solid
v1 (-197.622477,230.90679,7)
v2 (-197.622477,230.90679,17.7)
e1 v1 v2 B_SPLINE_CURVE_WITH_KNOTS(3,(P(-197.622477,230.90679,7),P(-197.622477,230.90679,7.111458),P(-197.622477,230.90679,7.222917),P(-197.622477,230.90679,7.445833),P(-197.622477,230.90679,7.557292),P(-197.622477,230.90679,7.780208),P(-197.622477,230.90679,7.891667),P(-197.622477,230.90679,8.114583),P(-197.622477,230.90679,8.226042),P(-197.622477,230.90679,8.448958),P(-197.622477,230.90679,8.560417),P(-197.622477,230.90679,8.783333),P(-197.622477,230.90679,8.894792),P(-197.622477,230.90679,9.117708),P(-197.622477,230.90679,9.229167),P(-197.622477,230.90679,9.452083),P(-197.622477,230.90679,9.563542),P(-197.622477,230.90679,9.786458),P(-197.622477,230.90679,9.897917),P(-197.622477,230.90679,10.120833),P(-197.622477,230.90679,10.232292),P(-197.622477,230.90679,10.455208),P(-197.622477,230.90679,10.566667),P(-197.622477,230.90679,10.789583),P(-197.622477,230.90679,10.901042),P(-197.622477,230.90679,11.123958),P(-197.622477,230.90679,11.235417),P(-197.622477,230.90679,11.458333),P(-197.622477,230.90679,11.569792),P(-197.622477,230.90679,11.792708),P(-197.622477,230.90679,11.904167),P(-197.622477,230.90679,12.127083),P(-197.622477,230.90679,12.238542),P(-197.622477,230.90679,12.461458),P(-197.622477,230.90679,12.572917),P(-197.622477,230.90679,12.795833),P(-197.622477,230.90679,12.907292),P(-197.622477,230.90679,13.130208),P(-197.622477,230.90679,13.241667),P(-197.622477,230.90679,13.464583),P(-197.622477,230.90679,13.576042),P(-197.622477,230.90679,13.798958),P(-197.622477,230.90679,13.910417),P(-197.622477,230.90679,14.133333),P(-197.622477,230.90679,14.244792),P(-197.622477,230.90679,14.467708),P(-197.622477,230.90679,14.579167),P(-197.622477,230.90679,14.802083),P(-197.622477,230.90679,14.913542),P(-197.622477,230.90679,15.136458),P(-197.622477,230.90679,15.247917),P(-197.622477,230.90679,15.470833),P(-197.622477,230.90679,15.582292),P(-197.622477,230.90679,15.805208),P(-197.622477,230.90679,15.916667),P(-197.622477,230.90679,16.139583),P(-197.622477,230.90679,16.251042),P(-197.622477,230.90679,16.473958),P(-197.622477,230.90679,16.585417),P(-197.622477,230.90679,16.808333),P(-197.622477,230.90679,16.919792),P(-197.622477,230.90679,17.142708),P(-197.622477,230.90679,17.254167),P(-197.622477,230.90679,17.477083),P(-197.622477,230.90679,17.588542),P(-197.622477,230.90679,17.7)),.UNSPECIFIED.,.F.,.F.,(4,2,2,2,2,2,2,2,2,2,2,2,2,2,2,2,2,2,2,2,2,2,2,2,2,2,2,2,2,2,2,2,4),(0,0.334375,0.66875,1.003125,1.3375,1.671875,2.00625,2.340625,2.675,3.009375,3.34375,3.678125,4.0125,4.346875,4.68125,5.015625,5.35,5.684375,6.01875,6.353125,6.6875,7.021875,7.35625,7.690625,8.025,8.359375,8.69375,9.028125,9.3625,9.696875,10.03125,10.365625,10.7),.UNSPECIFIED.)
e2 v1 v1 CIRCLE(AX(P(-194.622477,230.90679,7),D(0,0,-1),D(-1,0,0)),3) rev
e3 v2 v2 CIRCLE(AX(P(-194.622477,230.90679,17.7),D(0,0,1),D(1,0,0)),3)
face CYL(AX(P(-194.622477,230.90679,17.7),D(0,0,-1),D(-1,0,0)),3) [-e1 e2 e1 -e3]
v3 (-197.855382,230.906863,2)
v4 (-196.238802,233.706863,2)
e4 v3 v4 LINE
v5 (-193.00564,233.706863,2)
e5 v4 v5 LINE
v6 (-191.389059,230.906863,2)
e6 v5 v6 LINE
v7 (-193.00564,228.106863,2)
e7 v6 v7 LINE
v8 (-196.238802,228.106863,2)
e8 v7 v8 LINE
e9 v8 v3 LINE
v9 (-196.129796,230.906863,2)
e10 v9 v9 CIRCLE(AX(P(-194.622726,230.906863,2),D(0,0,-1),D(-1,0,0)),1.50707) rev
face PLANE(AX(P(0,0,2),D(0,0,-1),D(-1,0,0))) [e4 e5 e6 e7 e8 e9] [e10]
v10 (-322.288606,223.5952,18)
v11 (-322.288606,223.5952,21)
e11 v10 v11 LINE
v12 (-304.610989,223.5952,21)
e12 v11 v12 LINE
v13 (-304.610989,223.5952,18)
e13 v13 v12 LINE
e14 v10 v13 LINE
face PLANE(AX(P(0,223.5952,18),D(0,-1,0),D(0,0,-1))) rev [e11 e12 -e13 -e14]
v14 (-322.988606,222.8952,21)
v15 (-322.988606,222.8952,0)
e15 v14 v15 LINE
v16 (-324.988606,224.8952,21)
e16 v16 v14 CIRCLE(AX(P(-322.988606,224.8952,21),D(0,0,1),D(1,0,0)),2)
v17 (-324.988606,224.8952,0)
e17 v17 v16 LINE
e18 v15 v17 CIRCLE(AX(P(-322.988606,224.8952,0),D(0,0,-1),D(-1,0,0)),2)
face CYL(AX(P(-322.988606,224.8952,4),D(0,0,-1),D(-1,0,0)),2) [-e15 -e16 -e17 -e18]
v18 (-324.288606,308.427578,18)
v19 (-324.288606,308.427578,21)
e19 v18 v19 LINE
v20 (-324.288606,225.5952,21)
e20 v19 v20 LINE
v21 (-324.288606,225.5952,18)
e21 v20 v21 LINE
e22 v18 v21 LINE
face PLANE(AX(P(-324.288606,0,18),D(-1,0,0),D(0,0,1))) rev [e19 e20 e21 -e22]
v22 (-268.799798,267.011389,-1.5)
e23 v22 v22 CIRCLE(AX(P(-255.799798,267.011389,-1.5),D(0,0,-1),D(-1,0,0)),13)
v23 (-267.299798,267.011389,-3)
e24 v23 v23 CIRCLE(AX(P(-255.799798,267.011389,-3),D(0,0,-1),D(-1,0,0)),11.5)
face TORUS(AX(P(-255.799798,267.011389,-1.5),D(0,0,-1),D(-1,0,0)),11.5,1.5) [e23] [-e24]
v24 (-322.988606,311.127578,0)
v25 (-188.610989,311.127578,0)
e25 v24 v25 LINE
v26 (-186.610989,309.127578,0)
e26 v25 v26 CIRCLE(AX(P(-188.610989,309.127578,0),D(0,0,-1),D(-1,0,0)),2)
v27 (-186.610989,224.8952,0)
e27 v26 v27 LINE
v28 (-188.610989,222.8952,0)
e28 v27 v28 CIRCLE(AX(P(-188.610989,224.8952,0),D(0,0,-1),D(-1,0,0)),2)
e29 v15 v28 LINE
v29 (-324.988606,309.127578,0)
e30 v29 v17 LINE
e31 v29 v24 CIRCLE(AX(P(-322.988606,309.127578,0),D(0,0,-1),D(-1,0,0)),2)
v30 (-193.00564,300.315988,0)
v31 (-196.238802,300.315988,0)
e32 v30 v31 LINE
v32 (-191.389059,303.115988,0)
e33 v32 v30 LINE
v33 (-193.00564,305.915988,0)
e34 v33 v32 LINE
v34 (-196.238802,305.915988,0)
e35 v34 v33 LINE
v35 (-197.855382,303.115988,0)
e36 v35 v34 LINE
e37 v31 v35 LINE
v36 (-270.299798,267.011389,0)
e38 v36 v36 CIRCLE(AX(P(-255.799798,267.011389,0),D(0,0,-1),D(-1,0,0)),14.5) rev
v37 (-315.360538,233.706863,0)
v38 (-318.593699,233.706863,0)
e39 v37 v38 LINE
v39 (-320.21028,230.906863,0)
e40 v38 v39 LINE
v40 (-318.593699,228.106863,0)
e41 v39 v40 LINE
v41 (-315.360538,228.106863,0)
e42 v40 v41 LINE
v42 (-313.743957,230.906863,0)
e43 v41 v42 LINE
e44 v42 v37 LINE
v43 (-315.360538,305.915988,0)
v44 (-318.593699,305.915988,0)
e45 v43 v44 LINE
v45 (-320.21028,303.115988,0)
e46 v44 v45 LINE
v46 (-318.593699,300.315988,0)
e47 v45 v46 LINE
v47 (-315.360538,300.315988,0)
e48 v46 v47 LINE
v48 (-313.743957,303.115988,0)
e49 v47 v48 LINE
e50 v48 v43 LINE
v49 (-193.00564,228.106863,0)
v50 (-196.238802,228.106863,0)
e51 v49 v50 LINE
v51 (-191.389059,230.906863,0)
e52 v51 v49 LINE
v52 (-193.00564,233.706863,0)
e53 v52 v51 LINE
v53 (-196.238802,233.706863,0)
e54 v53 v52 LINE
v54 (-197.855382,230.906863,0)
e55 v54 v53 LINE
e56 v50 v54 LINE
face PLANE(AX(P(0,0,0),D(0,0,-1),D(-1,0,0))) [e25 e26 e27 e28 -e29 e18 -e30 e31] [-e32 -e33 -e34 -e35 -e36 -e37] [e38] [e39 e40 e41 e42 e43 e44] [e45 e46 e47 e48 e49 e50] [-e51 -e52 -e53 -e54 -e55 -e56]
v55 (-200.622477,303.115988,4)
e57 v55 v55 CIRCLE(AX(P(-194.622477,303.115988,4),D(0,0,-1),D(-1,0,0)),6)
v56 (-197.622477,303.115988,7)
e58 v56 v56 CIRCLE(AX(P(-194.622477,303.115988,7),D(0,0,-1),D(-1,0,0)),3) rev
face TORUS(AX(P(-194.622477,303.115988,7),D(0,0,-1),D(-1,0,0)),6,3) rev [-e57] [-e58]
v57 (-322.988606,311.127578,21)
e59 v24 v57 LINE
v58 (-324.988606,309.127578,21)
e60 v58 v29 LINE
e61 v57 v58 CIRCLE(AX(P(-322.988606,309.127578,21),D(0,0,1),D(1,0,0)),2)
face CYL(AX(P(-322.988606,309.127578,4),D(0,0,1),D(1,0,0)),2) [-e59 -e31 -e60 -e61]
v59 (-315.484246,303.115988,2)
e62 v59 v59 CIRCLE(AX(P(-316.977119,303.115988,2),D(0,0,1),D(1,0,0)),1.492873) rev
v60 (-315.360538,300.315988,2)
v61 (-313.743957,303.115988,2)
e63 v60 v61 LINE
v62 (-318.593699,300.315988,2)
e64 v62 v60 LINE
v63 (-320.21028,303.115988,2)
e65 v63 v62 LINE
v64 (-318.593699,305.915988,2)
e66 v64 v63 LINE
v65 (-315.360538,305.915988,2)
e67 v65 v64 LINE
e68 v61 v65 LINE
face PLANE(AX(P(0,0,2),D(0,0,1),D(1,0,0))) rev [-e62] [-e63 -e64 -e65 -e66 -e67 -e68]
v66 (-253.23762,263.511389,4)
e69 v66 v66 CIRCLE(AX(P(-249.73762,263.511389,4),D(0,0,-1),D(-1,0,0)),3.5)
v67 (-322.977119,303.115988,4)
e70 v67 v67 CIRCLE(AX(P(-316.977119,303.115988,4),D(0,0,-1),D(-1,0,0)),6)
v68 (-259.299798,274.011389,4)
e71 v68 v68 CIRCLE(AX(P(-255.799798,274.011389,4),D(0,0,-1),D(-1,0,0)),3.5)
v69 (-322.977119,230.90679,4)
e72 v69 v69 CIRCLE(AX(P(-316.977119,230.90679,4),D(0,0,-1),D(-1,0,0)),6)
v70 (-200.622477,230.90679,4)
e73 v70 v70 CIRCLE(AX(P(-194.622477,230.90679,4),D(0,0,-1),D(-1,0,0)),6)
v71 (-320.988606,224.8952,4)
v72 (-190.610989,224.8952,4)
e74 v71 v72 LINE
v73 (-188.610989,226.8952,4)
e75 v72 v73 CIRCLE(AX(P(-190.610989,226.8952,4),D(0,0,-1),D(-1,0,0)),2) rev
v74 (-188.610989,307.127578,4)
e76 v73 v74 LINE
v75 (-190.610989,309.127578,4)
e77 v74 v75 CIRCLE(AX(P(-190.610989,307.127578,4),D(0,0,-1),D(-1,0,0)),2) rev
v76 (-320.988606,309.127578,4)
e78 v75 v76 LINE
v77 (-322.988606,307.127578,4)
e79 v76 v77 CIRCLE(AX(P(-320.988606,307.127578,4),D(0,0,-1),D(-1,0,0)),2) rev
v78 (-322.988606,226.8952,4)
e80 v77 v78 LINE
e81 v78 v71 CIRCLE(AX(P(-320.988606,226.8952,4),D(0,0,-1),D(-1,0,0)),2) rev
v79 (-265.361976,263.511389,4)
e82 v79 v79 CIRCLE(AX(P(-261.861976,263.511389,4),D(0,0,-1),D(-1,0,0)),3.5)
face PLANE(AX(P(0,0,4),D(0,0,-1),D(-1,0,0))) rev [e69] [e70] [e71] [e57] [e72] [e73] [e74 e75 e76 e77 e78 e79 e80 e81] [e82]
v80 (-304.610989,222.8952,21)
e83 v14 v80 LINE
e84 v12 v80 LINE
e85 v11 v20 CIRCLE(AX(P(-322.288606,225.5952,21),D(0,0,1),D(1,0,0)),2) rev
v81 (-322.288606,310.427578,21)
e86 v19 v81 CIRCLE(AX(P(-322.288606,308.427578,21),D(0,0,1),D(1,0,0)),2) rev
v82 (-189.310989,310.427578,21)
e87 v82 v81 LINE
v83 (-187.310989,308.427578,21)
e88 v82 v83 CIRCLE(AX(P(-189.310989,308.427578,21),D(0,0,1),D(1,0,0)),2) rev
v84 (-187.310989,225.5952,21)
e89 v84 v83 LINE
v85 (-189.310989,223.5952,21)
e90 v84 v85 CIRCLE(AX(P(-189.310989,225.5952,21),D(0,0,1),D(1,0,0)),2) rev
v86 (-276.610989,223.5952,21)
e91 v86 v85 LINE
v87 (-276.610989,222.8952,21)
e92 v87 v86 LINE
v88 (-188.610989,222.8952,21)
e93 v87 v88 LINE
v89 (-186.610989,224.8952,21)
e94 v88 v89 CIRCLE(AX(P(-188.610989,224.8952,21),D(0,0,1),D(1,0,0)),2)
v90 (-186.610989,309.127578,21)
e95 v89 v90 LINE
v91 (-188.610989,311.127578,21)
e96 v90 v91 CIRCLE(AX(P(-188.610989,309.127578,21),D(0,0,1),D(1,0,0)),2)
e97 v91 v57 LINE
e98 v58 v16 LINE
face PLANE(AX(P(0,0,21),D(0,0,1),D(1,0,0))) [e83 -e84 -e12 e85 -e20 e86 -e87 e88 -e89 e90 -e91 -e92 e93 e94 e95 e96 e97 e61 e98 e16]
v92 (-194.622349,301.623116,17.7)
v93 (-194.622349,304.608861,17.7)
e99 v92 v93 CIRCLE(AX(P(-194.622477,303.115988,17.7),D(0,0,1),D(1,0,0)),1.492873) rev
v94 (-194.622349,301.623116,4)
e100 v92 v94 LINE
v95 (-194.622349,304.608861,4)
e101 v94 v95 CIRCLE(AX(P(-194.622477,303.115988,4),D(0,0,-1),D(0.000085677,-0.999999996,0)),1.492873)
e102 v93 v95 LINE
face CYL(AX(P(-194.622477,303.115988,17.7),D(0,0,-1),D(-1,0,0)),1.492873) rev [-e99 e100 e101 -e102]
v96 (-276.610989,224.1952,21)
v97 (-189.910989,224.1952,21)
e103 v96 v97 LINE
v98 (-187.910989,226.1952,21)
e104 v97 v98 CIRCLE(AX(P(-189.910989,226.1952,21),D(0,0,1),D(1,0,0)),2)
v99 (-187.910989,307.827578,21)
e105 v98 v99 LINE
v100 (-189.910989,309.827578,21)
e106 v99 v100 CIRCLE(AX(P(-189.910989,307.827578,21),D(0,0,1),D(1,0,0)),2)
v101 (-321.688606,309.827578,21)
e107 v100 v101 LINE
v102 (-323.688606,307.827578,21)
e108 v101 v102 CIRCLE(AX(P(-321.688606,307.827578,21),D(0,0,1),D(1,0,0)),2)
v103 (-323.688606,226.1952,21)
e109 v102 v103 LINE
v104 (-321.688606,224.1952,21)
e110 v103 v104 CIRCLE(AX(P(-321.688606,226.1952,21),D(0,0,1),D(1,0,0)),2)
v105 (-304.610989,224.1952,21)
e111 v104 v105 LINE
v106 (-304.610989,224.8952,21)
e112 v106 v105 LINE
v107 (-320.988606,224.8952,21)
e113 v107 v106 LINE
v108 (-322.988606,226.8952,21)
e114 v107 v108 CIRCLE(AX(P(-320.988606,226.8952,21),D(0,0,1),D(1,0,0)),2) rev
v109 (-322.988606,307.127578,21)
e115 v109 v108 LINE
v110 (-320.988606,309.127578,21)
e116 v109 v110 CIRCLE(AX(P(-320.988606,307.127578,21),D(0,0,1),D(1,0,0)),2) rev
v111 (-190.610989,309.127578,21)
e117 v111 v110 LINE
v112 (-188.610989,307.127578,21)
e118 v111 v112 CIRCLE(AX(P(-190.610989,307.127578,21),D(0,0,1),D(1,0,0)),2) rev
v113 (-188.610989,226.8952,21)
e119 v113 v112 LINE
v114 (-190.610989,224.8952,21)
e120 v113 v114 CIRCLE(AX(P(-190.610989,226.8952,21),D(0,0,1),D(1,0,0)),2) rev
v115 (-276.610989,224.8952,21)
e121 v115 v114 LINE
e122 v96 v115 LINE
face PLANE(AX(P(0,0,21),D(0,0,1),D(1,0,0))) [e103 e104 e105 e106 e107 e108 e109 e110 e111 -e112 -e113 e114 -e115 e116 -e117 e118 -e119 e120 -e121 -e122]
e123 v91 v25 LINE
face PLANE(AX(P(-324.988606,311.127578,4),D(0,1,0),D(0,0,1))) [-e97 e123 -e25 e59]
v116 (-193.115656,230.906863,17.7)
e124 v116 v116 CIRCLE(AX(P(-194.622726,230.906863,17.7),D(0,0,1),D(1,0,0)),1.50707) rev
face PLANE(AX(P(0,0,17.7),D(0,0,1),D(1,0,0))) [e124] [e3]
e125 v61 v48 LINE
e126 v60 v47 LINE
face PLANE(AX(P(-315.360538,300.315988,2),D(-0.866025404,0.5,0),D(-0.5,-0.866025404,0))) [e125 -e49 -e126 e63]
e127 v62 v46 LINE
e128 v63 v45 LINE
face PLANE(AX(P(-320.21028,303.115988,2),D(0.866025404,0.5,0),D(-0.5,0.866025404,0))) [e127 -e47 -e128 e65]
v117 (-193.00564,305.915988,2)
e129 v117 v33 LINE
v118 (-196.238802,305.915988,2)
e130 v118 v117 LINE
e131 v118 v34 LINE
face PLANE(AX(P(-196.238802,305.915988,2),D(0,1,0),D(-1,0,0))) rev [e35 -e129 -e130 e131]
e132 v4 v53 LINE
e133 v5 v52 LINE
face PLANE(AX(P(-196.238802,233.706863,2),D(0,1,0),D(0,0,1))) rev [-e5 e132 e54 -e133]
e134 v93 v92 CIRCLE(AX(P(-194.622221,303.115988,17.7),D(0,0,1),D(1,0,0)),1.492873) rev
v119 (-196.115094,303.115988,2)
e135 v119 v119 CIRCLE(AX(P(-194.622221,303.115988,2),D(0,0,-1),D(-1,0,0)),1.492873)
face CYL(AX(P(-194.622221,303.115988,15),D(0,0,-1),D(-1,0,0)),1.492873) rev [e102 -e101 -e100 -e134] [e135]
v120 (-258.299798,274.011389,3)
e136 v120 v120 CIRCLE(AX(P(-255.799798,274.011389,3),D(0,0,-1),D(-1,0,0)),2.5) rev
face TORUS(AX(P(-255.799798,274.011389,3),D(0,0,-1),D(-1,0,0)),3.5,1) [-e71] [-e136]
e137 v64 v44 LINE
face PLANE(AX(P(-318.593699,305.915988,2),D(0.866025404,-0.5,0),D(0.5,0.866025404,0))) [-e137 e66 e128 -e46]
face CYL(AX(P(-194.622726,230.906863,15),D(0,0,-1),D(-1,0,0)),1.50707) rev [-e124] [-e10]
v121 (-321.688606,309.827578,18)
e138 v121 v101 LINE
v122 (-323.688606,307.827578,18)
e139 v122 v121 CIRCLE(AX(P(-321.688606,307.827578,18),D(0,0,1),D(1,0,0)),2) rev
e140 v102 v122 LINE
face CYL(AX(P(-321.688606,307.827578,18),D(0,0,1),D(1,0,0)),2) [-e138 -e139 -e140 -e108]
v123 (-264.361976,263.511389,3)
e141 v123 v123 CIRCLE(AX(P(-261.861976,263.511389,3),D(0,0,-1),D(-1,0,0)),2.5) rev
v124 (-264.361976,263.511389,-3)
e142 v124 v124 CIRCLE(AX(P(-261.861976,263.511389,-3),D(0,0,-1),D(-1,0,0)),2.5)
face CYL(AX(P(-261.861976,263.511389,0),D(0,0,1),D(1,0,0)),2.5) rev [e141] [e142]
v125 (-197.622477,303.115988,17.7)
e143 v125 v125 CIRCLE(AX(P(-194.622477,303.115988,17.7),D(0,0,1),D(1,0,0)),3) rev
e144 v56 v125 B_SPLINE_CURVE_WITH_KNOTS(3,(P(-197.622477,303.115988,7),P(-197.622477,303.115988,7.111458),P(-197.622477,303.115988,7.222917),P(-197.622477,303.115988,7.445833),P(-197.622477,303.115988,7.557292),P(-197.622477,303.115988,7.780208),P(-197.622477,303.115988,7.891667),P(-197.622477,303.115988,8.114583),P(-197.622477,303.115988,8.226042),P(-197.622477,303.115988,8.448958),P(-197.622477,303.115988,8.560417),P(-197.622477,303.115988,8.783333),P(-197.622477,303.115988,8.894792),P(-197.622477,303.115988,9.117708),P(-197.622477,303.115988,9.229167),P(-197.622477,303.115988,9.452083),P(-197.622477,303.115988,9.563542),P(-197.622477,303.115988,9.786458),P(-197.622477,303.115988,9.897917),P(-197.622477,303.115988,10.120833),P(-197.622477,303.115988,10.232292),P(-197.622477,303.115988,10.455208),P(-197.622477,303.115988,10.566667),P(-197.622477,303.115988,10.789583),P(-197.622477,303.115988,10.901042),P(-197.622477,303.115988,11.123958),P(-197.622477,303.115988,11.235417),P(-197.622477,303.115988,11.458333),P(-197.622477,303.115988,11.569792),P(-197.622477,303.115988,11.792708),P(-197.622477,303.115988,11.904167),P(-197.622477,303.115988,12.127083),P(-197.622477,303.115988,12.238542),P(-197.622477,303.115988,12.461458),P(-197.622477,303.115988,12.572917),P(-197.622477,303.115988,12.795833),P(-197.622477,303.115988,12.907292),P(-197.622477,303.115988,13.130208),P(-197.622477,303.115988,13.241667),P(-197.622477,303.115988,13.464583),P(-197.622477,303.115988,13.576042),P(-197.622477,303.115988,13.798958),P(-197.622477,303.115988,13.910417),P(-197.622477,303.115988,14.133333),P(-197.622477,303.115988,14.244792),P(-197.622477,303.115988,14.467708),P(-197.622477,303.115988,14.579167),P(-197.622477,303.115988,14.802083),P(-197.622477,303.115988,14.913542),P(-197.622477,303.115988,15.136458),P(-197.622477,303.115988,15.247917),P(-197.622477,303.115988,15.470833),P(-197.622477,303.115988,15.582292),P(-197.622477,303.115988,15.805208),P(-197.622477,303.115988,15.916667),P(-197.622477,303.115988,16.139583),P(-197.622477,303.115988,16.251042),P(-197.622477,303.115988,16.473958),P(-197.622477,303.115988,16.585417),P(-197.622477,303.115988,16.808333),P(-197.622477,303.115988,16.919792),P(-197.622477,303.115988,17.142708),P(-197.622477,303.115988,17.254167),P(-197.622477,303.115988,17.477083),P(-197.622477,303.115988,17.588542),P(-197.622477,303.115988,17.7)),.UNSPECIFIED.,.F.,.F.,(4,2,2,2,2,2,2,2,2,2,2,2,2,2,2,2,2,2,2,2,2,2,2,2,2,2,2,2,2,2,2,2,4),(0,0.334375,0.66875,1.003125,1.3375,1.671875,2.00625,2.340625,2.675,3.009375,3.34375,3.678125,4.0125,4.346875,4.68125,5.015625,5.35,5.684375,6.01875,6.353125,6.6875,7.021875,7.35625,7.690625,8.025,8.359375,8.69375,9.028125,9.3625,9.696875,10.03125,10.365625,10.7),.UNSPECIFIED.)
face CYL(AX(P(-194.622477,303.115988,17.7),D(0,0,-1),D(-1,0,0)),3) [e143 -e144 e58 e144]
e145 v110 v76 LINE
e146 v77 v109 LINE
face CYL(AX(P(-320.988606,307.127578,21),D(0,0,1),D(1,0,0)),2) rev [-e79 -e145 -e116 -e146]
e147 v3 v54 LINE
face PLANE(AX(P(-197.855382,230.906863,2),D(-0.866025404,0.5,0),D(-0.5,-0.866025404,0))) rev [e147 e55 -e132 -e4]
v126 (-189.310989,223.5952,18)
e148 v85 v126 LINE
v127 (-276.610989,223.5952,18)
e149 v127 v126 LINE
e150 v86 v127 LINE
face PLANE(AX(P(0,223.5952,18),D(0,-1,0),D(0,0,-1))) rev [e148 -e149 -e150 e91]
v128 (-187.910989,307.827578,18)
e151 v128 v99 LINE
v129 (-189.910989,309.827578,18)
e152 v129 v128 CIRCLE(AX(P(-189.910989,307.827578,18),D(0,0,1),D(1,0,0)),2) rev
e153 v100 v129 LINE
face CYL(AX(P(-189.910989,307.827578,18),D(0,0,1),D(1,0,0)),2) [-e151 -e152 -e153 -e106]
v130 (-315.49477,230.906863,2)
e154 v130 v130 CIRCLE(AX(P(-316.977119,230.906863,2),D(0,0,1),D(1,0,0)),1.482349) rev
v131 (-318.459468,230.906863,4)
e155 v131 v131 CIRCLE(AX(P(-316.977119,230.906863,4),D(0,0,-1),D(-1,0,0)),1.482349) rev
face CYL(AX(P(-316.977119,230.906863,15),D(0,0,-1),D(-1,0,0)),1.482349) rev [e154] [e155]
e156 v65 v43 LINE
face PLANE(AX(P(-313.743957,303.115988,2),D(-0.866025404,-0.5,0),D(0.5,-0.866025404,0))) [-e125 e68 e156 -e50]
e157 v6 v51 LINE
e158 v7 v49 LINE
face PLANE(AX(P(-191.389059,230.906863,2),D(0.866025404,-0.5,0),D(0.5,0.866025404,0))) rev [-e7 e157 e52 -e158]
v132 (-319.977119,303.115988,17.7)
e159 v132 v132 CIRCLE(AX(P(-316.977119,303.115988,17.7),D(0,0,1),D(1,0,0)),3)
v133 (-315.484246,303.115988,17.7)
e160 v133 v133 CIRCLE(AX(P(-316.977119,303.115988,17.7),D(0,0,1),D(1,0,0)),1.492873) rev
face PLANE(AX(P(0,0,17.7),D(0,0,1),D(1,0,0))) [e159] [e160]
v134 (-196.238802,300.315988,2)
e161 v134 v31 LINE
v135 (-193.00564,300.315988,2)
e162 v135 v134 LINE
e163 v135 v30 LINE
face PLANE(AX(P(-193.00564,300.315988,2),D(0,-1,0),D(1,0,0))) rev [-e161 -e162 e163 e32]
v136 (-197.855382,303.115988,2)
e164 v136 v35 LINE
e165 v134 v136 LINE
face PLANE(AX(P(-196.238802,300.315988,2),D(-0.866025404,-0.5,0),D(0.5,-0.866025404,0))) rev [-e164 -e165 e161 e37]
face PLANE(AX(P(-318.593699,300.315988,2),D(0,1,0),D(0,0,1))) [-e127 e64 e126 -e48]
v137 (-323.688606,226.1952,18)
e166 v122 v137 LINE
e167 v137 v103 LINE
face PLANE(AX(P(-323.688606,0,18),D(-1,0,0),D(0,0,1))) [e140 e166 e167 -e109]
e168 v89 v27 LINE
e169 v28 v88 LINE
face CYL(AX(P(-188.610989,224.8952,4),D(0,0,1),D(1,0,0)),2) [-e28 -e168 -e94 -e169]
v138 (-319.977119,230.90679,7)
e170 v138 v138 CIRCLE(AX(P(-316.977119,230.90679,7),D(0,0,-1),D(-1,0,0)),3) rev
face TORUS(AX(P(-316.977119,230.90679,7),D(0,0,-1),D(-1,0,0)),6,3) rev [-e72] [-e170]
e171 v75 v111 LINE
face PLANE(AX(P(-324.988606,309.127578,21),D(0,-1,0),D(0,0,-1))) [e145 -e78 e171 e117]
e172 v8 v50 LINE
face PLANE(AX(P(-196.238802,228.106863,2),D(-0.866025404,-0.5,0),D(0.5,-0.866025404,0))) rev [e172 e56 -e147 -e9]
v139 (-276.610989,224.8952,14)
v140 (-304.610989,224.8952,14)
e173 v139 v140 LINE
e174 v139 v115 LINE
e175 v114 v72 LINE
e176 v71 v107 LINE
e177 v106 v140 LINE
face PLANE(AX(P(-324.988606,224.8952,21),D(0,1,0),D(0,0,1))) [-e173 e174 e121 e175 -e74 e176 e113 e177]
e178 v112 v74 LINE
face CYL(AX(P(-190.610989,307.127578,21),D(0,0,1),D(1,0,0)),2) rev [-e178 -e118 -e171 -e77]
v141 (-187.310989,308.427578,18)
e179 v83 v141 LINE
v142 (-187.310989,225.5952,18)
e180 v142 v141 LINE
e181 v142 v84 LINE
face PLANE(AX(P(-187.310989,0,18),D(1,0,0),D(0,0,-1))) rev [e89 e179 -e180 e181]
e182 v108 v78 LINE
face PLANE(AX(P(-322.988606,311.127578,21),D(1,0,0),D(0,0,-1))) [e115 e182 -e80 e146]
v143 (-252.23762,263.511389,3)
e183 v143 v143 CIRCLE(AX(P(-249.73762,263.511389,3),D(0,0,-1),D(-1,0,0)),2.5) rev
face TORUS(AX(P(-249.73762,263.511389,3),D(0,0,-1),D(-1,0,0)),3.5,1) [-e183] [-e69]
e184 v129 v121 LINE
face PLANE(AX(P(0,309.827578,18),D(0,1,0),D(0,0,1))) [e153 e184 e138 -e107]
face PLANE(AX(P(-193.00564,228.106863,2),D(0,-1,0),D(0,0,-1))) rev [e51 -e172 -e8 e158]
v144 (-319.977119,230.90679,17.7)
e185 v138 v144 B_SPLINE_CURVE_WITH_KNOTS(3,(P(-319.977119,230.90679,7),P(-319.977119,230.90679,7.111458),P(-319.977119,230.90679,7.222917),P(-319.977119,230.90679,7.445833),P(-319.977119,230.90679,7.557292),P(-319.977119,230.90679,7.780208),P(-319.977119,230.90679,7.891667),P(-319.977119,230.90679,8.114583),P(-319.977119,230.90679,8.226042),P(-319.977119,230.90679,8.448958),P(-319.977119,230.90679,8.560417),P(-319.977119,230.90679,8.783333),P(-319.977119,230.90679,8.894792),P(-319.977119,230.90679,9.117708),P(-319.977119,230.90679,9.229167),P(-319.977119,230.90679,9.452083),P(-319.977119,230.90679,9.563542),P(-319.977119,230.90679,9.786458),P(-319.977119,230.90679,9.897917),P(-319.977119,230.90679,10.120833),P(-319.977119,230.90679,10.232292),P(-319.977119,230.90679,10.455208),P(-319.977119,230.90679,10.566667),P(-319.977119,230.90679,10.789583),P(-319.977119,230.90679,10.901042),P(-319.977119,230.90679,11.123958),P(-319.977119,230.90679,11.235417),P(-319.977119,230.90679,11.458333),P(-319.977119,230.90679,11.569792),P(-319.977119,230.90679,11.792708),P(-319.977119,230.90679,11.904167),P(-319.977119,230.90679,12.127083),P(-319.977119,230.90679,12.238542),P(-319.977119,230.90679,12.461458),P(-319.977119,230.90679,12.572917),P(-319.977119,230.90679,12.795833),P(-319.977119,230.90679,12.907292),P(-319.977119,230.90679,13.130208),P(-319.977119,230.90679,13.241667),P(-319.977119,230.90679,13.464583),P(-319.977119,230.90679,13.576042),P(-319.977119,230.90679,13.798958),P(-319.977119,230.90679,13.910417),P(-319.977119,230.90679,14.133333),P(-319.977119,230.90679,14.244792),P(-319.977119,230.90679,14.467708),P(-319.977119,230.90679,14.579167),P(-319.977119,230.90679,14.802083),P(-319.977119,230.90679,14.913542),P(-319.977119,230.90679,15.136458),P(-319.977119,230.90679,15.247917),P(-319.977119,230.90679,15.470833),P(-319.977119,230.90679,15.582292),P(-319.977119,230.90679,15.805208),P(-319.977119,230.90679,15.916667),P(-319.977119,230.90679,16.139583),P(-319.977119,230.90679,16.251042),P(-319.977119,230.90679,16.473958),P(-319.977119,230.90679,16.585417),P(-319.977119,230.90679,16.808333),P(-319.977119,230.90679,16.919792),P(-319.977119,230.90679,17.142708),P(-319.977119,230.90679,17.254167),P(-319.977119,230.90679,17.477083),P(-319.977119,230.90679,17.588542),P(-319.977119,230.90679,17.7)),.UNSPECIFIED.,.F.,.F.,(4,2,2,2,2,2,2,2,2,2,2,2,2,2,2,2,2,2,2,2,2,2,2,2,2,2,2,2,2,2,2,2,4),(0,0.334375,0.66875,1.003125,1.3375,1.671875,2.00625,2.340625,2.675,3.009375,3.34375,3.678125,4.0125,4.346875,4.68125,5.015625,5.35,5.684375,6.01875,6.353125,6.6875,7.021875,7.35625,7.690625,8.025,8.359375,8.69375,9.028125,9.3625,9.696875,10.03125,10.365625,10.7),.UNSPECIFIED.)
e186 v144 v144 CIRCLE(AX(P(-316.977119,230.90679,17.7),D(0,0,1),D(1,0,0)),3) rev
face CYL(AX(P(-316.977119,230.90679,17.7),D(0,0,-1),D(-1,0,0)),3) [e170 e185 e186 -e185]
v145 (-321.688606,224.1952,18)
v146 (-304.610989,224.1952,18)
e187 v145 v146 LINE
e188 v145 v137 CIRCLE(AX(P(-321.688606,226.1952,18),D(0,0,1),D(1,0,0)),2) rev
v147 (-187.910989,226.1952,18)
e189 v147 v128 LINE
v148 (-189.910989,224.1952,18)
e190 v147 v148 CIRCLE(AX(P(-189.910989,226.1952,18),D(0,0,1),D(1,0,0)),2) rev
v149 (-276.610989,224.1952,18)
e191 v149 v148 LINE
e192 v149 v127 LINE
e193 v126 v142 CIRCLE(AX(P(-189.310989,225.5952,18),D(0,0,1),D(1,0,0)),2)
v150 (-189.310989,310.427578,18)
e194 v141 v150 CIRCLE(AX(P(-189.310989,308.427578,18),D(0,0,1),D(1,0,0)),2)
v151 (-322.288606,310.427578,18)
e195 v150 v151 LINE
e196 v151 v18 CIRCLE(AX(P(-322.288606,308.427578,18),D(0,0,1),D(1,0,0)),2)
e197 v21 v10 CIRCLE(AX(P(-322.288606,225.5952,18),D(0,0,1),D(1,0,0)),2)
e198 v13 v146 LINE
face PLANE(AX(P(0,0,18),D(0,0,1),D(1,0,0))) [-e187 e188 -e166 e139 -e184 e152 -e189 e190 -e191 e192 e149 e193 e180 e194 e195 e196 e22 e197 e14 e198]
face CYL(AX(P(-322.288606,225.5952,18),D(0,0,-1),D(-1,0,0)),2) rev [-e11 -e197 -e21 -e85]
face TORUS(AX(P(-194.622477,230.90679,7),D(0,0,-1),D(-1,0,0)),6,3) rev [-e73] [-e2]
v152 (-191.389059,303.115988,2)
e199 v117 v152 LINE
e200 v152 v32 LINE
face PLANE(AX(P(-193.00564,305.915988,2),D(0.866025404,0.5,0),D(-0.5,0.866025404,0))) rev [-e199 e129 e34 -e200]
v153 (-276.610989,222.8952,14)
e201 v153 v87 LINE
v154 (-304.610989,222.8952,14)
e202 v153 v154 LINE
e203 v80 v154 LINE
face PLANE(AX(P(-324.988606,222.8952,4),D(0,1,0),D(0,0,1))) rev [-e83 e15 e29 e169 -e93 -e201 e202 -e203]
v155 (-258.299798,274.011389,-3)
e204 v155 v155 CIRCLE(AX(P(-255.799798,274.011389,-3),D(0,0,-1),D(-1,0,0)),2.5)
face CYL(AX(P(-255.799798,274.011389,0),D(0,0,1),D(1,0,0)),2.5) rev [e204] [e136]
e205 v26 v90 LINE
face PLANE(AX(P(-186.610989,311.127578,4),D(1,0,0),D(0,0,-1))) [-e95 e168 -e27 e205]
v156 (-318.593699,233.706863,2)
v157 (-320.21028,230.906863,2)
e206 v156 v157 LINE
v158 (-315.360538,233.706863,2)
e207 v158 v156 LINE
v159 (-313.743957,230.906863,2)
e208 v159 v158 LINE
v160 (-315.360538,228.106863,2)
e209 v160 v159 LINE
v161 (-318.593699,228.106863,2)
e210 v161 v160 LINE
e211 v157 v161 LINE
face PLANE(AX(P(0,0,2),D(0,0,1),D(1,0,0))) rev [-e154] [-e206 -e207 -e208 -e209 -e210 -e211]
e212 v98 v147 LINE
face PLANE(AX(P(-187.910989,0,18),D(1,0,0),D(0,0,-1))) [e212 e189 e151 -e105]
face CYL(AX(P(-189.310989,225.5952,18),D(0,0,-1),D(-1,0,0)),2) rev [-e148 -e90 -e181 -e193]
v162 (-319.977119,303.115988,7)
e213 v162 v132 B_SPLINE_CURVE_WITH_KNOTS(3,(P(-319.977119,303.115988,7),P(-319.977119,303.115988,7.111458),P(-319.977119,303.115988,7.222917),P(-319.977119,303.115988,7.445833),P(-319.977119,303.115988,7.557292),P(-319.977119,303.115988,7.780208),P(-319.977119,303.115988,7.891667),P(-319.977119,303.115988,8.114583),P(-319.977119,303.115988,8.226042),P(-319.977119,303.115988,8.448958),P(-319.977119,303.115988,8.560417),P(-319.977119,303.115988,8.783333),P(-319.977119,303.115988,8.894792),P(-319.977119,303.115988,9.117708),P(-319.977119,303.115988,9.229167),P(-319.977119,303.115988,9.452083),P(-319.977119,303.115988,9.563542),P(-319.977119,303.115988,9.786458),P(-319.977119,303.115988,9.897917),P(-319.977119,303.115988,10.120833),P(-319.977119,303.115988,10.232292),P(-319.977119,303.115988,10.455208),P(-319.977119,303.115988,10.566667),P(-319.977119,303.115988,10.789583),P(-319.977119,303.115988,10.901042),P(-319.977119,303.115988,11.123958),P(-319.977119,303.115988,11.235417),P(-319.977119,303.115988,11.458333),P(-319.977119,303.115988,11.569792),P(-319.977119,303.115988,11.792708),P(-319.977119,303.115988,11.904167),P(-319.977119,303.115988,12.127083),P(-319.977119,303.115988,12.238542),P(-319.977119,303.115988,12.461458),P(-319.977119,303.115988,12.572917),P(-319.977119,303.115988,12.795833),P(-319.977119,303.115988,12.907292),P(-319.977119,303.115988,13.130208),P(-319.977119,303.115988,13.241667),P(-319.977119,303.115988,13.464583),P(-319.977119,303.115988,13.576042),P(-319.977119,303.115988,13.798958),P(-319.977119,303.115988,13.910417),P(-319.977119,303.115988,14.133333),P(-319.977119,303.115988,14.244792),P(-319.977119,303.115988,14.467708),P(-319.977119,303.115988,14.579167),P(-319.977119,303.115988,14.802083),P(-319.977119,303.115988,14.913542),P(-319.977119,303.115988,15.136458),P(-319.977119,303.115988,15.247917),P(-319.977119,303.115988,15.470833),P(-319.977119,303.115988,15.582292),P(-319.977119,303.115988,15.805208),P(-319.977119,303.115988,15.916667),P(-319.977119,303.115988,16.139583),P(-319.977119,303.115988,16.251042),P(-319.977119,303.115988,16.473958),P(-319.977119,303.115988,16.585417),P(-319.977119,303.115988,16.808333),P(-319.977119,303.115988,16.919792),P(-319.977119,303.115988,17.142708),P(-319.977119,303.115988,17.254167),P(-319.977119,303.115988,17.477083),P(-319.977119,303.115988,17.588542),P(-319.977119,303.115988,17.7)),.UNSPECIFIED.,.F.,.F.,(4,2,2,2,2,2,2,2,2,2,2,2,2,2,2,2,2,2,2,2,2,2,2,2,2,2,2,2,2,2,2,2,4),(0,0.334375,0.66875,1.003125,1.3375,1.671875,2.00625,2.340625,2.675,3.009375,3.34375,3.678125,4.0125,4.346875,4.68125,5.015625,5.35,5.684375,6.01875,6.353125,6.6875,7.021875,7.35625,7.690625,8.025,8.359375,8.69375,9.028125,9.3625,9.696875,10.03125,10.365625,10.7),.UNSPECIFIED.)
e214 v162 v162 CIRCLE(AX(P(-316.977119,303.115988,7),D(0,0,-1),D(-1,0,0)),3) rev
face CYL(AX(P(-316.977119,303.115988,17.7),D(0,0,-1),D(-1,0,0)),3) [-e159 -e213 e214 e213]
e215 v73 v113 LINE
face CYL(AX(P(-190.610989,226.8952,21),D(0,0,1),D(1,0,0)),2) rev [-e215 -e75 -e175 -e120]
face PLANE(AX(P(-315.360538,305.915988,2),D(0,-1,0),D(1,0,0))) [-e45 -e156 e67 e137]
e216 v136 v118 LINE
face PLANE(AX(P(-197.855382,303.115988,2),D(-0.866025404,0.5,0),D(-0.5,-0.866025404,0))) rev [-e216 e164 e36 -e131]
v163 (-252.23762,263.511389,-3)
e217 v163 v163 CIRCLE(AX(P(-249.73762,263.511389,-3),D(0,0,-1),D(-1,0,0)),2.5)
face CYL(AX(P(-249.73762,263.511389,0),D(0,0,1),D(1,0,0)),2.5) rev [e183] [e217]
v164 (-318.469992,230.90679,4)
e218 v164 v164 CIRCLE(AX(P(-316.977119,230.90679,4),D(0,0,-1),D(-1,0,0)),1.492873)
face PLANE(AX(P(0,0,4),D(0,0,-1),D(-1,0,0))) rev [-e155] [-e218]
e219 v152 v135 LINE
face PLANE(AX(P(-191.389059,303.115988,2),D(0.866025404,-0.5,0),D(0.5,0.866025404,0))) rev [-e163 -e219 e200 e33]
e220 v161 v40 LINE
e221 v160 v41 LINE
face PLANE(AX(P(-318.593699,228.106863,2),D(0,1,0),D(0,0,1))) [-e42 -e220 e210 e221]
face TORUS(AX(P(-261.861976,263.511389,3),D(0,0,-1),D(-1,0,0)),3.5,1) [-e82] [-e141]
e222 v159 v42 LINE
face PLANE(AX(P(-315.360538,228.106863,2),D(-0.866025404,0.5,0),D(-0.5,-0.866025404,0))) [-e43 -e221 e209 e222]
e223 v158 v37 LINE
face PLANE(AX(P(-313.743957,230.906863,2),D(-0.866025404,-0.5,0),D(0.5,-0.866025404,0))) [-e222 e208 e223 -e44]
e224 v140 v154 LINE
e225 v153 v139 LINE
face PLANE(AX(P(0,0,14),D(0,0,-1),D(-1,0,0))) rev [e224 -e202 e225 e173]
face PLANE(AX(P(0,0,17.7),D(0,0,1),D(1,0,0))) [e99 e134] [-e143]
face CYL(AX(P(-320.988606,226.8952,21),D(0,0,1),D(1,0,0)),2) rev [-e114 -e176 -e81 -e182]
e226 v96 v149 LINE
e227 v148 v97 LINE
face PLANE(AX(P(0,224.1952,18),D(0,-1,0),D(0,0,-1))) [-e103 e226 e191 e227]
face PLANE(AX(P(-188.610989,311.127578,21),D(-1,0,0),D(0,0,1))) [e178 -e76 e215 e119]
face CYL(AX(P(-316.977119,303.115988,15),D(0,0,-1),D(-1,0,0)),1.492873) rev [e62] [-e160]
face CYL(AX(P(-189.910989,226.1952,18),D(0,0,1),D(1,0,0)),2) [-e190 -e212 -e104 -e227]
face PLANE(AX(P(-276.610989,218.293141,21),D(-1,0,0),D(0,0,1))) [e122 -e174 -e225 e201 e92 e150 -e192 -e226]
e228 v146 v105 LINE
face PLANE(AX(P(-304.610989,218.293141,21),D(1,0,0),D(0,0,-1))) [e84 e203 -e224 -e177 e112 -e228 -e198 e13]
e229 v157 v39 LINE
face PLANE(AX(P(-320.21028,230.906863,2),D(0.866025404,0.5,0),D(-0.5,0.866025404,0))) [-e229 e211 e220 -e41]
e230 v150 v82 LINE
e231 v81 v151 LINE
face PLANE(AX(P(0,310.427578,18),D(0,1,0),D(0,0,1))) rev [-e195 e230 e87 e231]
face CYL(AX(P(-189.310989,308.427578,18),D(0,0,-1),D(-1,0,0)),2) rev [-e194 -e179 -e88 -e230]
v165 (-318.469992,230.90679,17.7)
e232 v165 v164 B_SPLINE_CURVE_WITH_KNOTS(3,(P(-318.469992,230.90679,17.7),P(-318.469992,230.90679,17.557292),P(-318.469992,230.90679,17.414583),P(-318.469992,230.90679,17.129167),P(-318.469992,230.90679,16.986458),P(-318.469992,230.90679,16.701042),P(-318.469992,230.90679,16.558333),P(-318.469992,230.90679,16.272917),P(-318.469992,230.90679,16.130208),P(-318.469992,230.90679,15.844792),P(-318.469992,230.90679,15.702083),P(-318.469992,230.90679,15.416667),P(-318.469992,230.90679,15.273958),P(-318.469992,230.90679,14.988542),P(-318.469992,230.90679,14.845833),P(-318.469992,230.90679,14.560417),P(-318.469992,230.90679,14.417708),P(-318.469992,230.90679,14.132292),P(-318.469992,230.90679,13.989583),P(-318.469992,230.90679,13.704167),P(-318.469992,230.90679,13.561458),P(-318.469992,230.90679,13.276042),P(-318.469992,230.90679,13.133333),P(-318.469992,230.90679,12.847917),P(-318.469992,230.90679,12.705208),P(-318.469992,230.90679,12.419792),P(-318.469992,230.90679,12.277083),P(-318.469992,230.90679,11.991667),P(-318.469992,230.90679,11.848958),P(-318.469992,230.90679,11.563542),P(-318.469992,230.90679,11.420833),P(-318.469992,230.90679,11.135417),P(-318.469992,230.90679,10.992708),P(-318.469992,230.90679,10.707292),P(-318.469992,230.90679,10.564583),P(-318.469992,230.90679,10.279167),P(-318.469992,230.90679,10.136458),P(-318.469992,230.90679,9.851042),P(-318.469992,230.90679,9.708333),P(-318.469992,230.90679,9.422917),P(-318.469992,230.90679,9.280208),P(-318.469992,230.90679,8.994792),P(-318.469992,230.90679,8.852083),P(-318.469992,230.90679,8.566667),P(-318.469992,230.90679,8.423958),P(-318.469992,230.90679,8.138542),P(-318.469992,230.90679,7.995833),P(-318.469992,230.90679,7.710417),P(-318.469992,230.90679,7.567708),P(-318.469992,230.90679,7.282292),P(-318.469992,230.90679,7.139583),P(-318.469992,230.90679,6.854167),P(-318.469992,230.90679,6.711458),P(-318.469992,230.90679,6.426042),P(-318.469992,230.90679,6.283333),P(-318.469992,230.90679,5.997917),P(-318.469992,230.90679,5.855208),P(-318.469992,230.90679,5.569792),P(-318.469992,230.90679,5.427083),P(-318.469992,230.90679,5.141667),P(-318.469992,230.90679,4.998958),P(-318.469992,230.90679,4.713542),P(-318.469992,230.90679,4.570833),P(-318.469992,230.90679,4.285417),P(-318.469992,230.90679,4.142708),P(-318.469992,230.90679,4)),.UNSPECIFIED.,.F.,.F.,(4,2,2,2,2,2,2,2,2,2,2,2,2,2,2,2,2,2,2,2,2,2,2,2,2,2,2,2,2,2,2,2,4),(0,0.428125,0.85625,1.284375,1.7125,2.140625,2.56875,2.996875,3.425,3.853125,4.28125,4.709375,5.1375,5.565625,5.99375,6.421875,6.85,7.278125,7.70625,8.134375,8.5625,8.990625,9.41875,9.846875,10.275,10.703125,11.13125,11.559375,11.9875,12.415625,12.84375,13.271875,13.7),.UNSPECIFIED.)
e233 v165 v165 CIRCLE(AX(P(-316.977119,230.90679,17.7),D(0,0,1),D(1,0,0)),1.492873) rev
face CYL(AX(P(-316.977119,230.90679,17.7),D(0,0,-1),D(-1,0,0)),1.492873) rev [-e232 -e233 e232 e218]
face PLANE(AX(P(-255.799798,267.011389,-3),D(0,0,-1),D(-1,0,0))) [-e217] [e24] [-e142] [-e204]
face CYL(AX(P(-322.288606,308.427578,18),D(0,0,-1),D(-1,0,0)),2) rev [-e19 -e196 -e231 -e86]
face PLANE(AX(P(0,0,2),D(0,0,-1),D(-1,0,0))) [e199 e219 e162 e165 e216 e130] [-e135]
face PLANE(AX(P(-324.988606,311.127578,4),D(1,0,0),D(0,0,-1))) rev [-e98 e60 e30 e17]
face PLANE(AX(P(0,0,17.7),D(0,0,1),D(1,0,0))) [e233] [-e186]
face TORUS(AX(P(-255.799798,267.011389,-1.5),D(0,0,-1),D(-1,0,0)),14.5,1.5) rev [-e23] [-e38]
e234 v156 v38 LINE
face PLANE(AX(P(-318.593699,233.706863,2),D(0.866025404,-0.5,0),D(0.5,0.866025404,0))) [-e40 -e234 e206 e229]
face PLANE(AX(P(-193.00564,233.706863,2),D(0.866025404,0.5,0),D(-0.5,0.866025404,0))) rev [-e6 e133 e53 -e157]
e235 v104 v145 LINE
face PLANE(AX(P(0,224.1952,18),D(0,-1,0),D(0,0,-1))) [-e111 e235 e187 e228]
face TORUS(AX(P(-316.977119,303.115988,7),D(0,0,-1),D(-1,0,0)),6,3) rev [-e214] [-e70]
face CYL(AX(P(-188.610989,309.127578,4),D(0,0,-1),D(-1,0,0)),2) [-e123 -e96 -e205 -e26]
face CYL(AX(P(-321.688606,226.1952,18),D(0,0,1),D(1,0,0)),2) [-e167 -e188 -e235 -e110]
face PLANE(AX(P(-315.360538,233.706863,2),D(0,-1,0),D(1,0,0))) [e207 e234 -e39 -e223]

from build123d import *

# Parameters (mm, degrees)
SZKIC2_W                                   = 138.377616904
SZKIC2_H                                   = 88.232378654
DODANIE_WYCI_GNI_CIE1_DEPTH                = 4
WYTNIJ_WYCI_GNI_CIE1_DEPTH                 = 2
SZKIC4_W                                   = 138.377616904
SZKIC4_H                                   = 88.232378654
SZKIC4_W_2                                 = 134.377616904
SZKIC4_H_2                                 = 84.232378654
WYCI_GNI_CIE_CIENKA_CIANKA1_DEPTH          = 17
SZKIC2_5_R                                 = 1.492872888
SZKIC2_5_R_2                               = 1.482348965
SZKIC2_5_R_3                               = 1.507070184
WYTNIJ_WYCI_GNI_CIE3_DEPTH                 = 15
DODANIE_WYCI_GNI_CIE2_OUTLINE_R            = 3
DODANIE_WYCI_GNI_CIE2_OUTLINE_R_2          = 1.507070184
DODANIE_WYCI_GNI_CIE2_OUTLINE_R_3          = 1.492872888
DODANIE_WYCI_GNI_CIE2_DEPTH                = 13.7
SZKIC6_W                                   = 136.977616904
SZKIC6_H                                   = 86.832378654
SZKIC6_W_2                                 = 135.777616904
SZKIC6_H_2                                 = 85.632378654
WYCI_CIE_WYCI_GNI_CIE_CIENKA_CIANKA1_DEPTH = 3
ZAOKR_GLENIE1_R                            = 3
ZAOKR_GLENIE2_R                            = 2
SZKIC8_R                                   = 2.5
WYTNIJ_WYCI_GNI_CIE4_DEPTH                 = 451.2299015
DODANIE_WYCI_GNI_CIE3_START                = -4
SZKIC8_3_R                                 = 13
SZKIC8_3_R_2                               = 2.5
DODANIE_WYCI_GNI_CIE3_DEPTH                = 3
ZAOKR_GLENIE3_R                            = 1.5
ZAOKR_GLENIE4_R                            = 1
WYTNIJ_WYCI_GNI_CIE5_START                 = 10
SZKIC10_W                                  = 28
SZKIC10_H                                  = 13.675297862
WYTNIJ_WYCI_GNI_CIE5_DEPTH                 = 441.2299015


# Read off the part's stored shape, not the designer's step: Dodanie-wyciągnięcie2
with BuildPart() as part:
    # Szkic2 → Dodanie-wyciągnięcie1 (new body)
    with BuildSketch(Plane.XY):
        with Locations((-255.799797678, 267.011389153)):
            Rectangle(SZKIC2_W, SZKIC2_H)
    extrude(amount=DODANIE_WYCI_GNI_CIE1_DEPTH)

    # Szkic2<4> → Wytnij-wyciągnięcie1 (cut)
    with BuildSketch(Plane.XY):
        Polygon((-196.238801669, 233.706863015), (-193.005640162, 233.706863015), (-191.389059408, 230.906863015), (-193.005640162, 228.106863015), (-196.238801669, 228.106863015), (-197.855382423, 230.906863015), align=None)
        Polygon((-318.593699386, 305.915988479), (-320.21028014, 303.115988479), (-318.593699386, 300.315988479), (-315.360537879, 300.315988479), (-313.743957125, 303.115988479), (-315.360537879, 305.915988479), align=None)
        Polygon((-318.593699386, 233.706863015), (-320.21028014, 230.906863015), (-318.593699386, 228.106863015), (-315.360537879, 228.106863015), (-313.743957125, 230.906863015), (-315.360537879, 233.706863015), align=None)
        Polygon((-196.238801669, 305.915988479), (-193.005640162, 305.915988479), (-191.389059408, 303.115988479), (-193.005640162, 300.315988479), (-196.238801669, 300.315988479), (-197.855382423, 303.115988479), align=None)
    extrude(amount=WYTNIJ_WYCI_GNI_CIE1_DEPTH, mode=Mode.SUBTRACT)

    # Szkic4 → Wyciągnięcie-cienka ścianka1 (add)
    with BuildSketch(Plane.XY.offset(4)):
        with Locations((-255.799797678, 267.011389153)):
            Rectangle(SZKIC4_W, SZKIC4_H)
        with Locations((-255.799797678, 267.011389153)):
            Rectangle(SZKIC4_W_2, SZKIC4_H_2, mode=Mode.SUBTRACT)
    extrude(amount=WYCI_GNI_CIE_CIENKA_CIANKA1_DEPTH)

    # Szkic2<5> → Wytnij-wyciągnięcie3 (cut)
    with BuildSketch(Plane.XY):
        with Locations(Location((-316.977118633, 303.115988479, 0), (0, 0, 180))):
            Circle(SZKIC2_5_R)
        with Locations(Location((-316.977118633, 230.906863015, 0), (0, 0, 180))):
            Circle(SZKIC2_5_R_2)
        with Locations(Location((-194.622725918, 230.906863015, 0), (0, 0, 180))):
            Circle(SZKIC2_5_R_3)
        with Locations(Location((-194.622220915, 303.115988479, 0), (0, 0, 180))):
            Circle(SZKIC2_5_R)
    extrude(amount=WYTNIJ_WYCI_GNI_CIE3_DEPTH, mode=Mode.SUBTRACT)

    # Dodanie-wyciągnięcie2 outline → Dodanie-wyciągnięcie2 (add)
    # profile 1 of 4: a face of its own
    with BuildSketch(Plane.XY.offset(4)):
        with Locations((-194.622476723, 230.906789826)):
            Circle(DODANIE_WYCI_GNI_CIE2_OUTLINE_R)
        with Locations((-194.622725918, 230.906863015)):
            Circle(DODANIE_WYCI_GNI_CIE2_OUTLINE_R_2, mode=Mode.SUBTRACT)
    # profile 2 of 4: a face of its own
    with BuildSketch(Plane.XY.offset(4)):
        with Locations((-194.622476723, 303.115988479)):
            Circle(DODANIE_WYCI_GNI_CIE2_OUTLINE_R)
        with BuildLine():
            ThreePointArc((-194.622348819, 304.608861362), (-193.129348027, 303.115988479), (-194.622348819, 301.623115596))
            ThreePointArc((-194.622348819, 301.623115596), (-196.115349611, 303.11598848), (-194.622348819, 304.608861362))
        make_face(mode=Mode.SUBTRACT)
    # profile 3 of 4: a face of its own
    with BuildSketch(Plane.XY.offset(4)):
        with Locations((-316.977118633, 303.115988479)):
            Circle(DODANIE_WYCI_GNI_CIE2_OUTLINE_R)
        with Locations((-316.977118633, 303.115988479)):
            Circle(DODANIE_WYCI_GNI_CIE2_OUTLINE_R_3, mode=Mode.SUBTRACT)
    # profile 4 of 4: a face of its own
    with BuildSketch(Plane.XY.offset(4)):
        with Locations((-316.977118633, 230.906789826)):
            Circle(DODANIE_WYCI_GNI_CIE2_OUTLINE_R)
        with Locations((-316.977118633, 230.906789826)):
            Circle(DODANIE_WYCI_GNI_CIE2_OUTLINE_R_3, mode=Mode.SUBTRACT)
    extrude(amount=DODANIE_WYCI_GNI_CIE2_DEPTH)

    # Szkic6 → Wycięcie-wyciągnięcie-cienka ścianka1 (cut)
    with BuildSketch(Plane.XY.offset(21)):
        with Locations((-255.799797678, 267.011389153)):
            Rectangle(SZKIC6_W, SZKIC6_H)
        with Locations((-255.799797678, 267.011389153)):
            Rectangle(SZKIC6_W_2, SZKIC6_H_2, mode=Mode.SUBTRACT)
    extrude(amount=-WYCI_CIE_WYCI_GNI_CIE_CIENKA_CIANKA1_DEPTH, mode=Mode.SUBTRACT)

    # Zaokrąglenie1
    zaokr_glenie1_edges = [part.edges().sort_by_distance(p)[0] for p in [
        (-319.977118633, 303.115988479, 4),
        (-197.622476723, 230.906789826, 4),
        (-197.622476723, 303.115988479, 4),
        (-319.977118633, 230.906789826, 4),
    ]]
    fillet(zaokr_glenie1_edges, radius=ZAOKR_GLENIE1_R)

    # Zaokrąglenie2
    zaokr_glenie2_edges = [part.edges().sort_by_distance(p)[0] for p in [
        (-324.28860613, 223.595199826, 19.5),
        (-324.28860613, 310.42757848, 19.5),
        (-187.310989226, 310.42757848, 19.5),
        (-187.310989226, 223.595199826, 19.5),
        (-323.68860613, 309.82757848, 19.5),
        (-187.910989226, 309.82757848, 19.5),
        (-187.910989226, 224.195199826, 19.5),
        (-323.68860613, 224.195199826, 19.5),
        (-324.98860613, 311.12757848, 10.5),
        (-324.98860613, 222.895199826, 10.5),
        (-186.610989226, 222.895199826, 10.5),
        (-186.610989226, 311.12757848, 10.5),
        (-322.98860613, 224.895199826, 12.5),
        (-188.610989226, 224.895199826, 12.5),
        (-188.610989226, 309.12757848, 12.5),
        (-322.98860613, 309.12757848, 12.5),
    ]]
    fillet(zaokr_glenie2_edges, radius=ZAOKR_GLENIE2_R)

    # Szkic8 → Wytnij-wyciągnięcie4 (cut, through all)
    with BuildSketch(Plane.XY.offset(4)):
        with Locations((-261.861975505, 263.511389153)):
            Circle(SZKIC8_R)
        with Locations((-249.737619852, 263.511389153)):
            Circle(SZKIC8_R)
        with Locations((-255.799797678, 274.011389153)):
            Circle(SZKIC8_R)
    extrude(amount=-WYTNIJ_WYCI_GNI_CIE4_DEPTH, mode=Mode.SUBTRACT)

    # Szkic8<3> → Dodanie-wyciągnięcie3 (add)
    with BuildSketch(Plane.XY.offset(4).offset(DODANIE_WYCI_GNI_CIE3_START)):
        with Locations(Location((-255.799797678, 267.011389153, 0), (0, 0, 180))):
            Circle(SZKIC8_3_R)
        with Locations((-261.861975505, 263.511389153)):
            Circle(SZKIC8_3_R_2, mode=Mode.SUBTRACT)
        with Locations((-249.737619852, 263.511389153)):
            Circle(SZKIC8_3_R_2, mode=Mode.SUBTRACT)
        with Locations((-255.799797678, 274.011389153)):
            Circle(SZKIC8_3_R_2, mode=Mode.SUBTRACT)
    extrude(amount=-DODANIE_WYCI_GNI_CIE3_DEPTH)

    # Zaokrąglenie3
    zaokr_glenie3_edges = [part.edges().sort_by_distance(p)[0] for p in [
        (-242.799797678, 267.011389153, -3),
        (-242.799797678, 267.011389153, 0),
    ]]
    fillet(zaokr_glenie3_edges, radius=ZAOKR_GLENIE3_R - 0.0001)  # a hair under: the kernel refuses the full size

    # Zaokrąglenie4
    zaokr_glenie4_edges = [part.edges().sort_by_distance(p)[0] for p in [
        (-258.299797678, 274.011389153, 4),
        (-264.361975505, 263.511389153, 4),
        (-252.237619852, 263.511389153, 4),
    ]]
    fillet(zaokr_glenie4_edges, radius=ZAOKR_GLENIE4_R)

    # Szkic10 → Wytnij-wyciągnięcie5 (cut, through all)
    with BuildSketch(Plane.XY.offset(4).offset(WYTNIJ_WYCI_GNI_CIE5_START)):
        with Locations((-290.610989226, 225.130789449)):
            Rectangle(SZKIC10_W, SZKIC10_H)
    extrude(amount=WYTNIJ_WYCI_GNI_CIE5_DEPTH, mode=Mode.SUBTRACT)


solid = part.part
